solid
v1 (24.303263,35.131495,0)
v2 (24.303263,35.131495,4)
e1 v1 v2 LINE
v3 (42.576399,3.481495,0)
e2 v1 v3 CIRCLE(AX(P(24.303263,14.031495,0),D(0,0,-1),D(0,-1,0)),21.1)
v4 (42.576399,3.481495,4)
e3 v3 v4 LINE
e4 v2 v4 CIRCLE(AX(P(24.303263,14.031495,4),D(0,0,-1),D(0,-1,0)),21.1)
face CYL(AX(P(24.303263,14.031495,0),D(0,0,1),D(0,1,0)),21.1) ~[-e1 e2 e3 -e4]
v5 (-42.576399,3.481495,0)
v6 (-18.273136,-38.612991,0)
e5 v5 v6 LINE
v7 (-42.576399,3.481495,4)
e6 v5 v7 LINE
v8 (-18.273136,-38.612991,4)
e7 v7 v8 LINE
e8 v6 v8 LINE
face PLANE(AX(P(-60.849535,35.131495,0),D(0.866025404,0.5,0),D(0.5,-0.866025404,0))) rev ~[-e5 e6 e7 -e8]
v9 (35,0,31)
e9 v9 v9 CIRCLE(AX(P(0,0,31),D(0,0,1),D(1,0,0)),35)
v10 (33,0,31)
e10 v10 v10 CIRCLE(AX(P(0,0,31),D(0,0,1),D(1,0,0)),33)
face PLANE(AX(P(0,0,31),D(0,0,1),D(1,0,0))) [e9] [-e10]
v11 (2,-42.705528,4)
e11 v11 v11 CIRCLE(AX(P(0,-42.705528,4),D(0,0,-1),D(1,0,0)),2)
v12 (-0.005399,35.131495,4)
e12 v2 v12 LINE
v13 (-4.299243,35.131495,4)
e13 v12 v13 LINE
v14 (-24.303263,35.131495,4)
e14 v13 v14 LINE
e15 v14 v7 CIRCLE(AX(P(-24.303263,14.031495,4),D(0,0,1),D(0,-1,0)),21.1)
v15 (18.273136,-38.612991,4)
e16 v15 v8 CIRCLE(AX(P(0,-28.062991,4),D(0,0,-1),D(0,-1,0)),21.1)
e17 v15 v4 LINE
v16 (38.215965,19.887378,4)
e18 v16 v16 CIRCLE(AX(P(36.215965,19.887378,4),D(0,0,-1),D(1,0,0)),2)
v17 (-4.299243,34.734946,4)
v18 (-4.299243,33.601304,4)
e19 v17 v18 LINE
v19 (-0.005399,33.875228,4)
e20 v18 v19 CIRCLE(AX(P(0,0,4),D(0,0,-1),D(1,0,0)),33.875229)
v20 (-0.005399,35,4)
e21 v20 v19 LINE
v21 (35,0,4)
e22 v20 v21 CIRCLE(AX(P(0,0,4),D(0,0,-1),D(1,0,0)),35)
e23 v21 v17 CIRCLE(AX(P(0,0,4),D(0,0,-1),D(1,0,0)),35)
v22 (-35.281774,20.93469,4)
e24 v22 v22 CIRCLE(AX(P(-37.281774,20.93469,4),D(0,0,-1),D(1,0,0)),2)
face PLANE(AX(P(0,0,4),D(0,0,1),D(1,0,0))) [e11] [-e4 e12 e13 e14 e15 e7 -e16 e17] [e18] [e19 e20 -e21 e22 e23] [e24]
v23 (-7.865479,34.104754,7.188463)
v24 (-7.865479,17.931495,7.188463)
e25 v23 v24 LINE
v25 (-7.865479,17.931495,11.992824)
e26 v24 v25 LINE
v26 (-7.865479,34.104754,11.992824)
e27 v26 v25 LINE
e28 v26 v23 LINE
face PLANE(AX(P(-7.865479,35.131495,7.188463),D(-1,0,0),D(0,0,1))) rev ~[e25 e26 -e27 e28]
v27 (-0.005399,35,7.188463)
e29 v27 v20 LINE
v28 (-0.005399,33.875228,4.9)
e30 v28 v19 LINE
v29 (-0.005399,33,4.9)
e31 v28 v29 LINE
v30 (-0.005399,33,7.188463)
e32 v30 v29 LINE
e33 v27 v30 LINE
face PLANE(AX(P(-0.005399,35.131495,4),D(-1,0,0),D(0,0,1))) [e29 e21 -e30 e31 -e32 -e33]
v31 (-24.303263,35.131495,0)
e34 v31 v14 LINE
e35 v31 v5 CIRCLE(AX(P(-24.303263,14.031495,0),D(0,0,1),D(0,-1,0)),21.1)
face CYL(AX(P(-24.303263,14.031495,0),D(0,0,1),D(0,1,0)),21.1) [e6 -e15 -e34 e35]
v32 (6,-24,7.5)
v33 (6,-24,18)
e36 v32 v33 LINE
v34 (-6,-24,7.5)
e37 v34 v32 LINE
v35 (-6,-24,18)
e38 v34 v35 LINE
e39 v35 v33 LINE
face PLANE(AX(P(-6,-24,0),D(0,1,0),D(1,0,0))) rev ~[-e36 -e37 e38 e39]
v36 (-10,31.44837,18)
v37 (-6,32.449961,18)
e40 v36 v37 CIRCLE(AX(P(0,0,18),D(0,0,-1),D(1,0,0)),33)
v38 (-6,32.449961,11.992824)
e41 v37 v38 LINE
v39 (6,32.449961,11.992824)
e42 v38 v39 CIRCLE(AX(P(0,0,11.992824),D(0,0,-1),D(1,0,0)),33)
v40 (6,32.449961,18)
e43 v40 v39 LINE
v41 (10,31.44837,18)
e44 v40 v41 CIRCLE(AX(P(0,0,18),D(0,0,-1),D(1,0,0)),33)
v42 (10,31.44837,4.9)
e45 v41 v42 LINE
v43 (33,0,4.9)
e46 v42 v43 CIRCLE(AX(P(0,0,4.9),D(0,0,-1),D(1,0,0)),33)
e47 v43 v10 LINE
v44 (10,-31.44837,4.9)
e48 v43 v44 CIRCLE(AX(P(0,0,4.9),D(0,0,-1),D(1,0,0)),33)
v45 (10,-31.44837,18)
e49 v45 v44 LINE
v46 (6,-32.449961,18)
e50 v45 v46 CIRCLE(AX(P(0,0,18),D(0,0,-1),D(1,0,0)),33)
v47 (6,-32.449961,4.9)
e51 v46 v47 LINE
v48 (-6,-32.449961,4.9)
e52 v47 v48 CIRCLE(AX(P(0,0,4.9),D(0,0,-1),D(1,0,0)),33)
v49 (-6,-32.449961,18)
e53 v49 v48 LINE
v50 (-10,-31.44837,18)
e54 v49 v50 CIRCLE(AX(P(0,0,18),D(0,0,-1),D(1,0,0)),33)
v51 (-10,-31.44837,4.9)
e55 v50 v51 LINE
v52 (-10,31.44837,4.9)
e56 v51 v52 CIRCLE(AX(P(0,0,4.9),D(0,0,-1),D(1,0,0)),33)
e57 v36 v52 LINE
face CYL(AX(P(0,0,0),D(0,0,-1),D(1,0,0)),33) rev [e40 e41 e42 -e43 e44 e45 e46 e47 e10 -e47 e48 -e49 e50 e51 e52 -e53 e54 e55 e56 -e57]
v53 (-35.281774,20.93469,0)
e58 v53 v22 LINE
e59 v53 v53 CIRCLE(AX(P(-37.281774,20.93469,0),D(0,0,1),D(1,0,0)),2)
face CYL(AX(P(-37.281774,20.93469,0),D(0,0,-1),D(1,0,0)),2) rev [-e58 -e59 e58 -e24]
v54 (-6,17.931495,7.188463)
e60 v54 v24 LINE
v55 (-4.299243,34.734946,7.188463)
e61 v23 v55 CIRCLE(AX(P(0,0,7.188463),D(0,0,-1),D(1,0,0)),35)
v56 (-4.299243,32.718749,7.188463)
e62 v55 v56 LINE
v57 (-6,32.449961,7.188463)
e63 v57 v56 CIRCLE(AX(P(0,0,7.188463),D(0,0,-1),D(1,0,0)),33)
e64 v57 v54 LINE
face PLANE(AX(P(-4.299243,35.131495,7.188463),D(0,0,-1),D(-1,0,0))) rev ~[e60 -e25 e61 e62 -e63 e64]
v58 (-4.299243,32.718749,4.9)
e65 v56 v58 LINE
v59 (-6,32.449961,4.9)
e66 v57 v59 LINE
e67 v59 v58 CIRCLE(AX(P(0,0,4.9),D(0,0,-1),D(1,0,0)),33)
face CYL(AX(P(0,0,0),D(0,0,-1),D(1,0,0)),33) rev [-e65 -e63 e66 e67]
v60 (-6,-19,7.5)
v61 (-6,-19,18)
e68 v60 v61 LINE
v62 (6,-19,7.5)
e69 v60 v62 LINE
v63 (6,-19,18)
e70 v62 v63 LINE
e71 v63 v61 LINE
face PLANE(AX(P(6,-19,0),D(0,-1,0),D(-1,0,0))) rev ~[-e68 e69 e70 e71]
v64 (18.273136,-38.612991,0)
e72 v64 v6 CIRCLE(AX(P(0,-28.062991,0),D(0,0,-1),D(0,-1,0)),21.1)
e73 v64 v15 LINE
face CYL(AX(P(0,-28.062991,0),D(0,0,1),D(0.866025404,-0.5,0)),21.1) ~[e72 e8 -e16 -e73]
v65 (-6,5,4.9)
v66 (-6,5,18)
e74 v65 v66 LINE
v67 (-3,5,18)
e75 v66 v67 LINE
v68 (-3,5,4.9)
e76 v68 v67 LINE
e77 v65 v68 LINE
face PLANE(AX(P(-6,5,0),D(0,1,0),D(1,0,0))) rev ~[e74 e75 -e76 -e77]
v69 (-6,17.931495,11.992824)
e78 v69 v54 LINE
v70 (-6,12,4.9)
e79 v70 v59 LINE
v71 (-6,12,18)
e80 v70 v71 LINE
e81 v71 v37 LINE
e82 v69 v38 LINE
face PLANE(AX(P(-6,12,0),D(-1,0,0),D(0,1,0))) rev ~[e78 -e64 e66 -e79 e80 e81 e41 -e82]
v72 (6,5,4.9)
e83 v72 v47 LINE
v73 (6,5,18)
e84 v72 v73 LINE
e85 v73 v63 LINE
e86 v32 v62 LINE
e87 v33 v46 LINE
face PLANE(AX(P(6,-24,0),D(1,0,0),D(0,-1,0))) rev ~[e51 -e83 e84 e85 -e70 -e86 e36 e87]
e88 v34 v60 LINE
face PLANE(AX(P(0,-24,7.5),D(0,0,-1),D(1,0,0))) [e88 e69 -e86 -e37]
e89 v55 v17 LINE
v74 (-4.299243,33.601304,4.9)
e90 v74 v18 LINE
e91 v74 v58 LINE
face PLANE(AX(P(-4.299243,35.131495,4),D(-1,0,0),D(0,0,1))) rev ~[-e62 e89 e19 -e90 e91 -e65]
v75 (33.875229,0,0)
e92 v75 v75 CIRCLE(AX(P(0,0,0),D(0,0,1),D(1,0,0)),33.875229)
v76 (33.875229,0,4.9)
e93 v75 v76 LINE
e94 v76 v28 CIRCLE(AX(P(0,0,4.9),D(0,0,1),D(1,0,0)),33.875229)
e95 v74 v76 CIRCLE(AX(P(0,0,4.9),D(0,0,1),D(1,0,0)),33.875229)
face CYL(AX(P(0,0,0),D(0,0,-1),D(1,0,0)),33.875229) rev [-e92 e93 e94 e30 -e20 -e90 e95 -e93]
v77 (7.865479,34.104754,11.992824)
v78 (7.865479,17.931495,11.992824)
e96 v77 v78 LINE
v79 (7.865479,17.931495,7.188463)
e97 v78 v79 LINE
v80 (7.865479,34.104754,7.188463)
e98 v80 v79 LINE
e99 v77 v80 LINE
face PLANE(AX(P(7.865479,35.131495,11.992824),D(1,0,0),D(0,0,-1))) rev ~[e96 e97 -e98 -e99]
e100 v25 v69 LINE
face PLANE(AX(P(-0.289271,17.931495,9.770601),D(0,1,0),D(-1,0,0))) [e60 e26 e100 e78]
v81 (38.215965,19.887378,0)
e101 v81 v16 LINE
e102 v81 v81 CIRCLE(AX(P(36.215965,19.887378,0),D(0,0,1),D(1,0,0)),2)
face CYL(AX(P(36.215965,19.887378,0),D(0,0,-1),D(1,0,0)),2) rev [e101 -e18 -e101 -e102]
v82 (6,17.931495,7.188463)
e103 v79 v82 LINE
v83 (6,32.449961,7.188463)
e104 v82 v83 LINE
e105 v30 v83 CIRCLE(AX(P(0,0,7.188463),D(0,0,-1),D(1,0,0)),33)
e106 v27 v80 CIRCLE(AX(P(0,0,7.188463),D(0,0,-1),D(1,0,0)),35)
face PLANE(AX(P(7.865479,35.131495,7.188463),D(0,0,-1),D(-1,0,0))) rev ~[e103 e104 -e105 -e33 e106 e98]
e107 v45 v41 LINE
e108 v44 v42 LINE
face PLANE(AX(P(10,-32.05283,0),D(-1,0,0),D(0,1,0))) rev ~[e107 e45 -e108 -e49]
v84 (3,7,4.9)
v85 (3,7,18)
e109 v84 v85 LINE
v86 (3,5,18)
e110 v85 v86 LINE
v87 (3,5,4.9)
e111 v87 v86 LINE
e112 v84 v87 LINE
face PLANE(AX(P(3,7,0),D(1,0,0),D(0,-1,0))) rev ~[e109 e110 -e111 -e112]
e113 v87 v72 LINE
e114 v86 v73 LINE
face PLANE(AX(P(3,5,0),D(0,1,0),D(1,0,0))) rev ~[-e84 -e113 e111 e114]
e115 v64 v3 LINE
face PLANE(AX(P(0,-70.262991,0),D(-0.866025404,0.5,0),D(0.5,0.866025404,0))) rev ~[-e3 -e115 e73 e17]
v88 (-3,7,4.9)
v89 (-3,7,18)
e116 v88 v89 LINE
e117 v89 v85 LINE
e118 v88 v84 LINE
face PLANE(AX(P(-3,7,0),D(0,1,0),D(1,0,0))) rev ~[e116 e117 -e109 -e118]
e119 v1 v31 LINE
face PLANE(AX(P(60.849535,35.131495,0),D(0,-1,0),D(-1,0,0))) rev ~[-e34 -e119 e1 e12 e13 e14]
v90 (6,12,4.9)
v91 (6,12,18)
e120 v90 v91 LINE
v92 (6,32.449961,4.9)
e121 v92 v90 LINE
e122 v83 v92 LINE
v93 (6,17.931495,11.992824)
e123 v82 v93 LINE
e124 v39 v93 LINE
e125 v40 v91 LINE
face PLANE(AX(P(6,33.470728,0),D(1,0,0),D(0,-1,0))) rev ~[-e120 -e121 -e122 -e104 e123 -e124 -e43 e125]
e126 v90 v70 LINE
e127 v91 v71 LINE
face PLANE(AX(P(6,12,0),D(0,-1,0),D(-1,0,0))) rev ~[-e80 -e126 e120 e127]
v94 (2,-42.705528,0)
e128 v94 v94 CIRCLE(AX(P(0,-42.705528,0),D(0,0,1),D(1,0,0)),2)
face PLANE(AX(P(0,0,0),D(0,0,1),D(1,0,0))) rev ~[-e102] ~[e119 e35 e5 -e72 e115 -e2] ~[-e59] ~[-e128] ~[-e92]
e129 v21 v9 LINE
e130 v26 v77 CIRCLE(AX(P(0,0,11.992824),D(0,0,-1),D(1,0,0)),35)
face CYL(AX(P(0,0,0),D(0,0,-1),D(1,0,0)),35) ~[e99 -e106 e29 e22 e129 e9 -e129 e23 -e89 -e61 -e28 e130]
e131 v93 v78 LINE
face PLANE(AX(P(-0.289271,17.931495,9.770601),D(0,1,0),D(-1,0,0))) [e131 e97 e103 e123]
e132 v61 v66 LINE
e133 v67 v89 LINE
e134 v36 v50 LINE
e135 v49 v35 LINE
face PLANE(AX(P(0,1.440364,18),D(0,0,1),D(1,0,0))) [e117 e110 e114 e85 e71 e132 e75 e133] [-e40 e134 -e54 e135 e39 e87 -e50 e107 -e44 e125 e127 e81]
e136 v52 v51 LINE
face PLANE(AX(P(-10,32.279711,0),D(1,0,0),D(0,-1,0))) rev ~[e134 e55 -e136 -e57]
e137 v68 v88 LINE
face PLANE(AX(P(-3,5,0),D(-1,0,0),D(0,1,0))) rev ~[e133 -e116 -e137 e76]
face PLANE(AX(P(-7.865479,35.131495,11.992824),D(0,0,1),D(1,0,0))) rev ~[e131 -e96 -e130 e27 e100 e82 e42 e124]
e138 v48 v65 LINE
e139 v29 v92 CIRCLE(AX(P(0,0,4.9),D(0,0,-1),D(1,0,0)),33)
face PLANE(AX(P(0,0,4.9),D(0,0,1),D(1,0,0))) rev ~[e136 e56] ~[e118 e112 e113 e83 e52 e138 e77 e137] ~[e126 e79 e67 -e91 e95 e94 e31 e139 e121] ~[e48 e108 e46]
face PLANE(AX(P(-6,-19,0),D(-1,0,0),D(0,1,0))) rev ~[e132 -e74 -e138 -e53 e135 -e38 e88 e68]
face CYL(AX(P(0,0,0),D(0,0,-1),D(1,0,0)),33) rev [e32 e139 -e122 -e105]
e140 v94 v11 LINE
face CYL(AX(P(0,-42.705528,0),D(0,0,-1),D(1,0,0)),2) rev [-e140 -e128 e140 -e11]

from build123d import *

# Parameters (mm, degrees)
F0_R              = 35
F0_R_2            = 33
F2_DEPTH          = 31
F3_DEPTH          = 18
F4_E28_W          = 6
F4_E28_H          = 7.5
F4_E39_MIRRORCS_W = 6
F4_E39_MIRRORCS_H = 7.5
F5_DEPTH          = 9.3
F7_DEPTH          = 4
F8_R              = 21.1
F9_R              = 2
F10_DEPTH         = 38
F11_DEPTH         = 52
F12_DEPTH         = 37.9
F13_R             = 33.8752288108
F14_DEPTH         = 4.9
F15_W             = 4.2938441038
F15_H             = 3.1884626523
F16_DEPTH         = 17.2


with BuildPart() as f2:
    # F0 (on Top) → F2 (new body)
    with BuildSketch(Plane.XY):
        Circle(F0_R)
        Circle(F0_R_2, mode=Mode.SUBTRACT)
    extrude(amount=F2_DEPTH)

    # F1 (on Top) → F3 (join)
    with BuildSketch(Plane.XY):
        Polygon((10, -32.0528298616), (10, -24), (10, 32.2797112167), (6, 33.4707275033), (6, 12), (3, 12), (0, 12), (-3, 12), (-6, 12), (-6, 33.4707275033), (-10, 32.2797112167), (-10, -24), (-10, -32.0528298616), (-6, -33.1044308841), (-6, -24), (0, -24), (6, -24), (6, -33.1044308841), align=None)
        Polygon((0, 7), (3, 7), (3, 5), (6, 5), (6, -19), (0, -19), (-6, -19), (-6, 5), (-3, 5), (-3, 7), align=None, mode=Mode.SUBTRACT)
    extrude(amount=F3_DEPTH)

    # F4_E28 (on explicit) + F4_E39_MirrorCS (on explicit) → F5 (cut)
    with BuildSketch(Plane.XZ.offset(24)):
        with Locations((3, 3.75)):
            Rectangle(F4_E28_W, F4_E28_H)
    with BuildSketch(Plane(origin=(0, -24, 0), x_dir=(-1, 0, 0), z_dir=(0, 1, 0))):
        with Locations((3, 3.75)):
            Rectangle(F4_E39_MIRRORCS_W, F4_E39_MIRRORCS_H)
    extrude(amount=-F5_DEPTH, dir=(0, -1, 0), mode=Mode.SUBTRACT)

    # F6 (on Top) → F7 (join)
    with BuildSketch(Plane.XY):
        Polygon((60.8495350583, 35.131495446), (-60.8495350583, 35.131495446), (0, -70.2629908919), align=None)
    extrude(amount=F7_DEPTH)

    # F8
    f8_edges = [f2.edges().sort_by_distance(p)[0] for p in [
        (-60.849535, 35.131495, 2),
        (60.849535, 35.131495, 2),
        (0, -70.262991, 2),
    ]]
    fillet(f8_edges, radius=F8_R)

    # F9 (on Top) → F10 (cut)
    with BuildSketch(Plane.XY):
        with Locations((-37.2817739844, 20.93468979)):
            Circle(F9_R)
        with Locations((0, -42.7055284381)):
            Circle(F9_R)
        with Locations((36.2159647048, 19.8873784393)):
            Circle(F9_R)
    extrude(amount=-F10_DEPTH, mode=Mode.SUBTRACT)

    # F9 (on Top) → F11 (cut)
    with BuildSketch(Plane.XY):
        with Locations((36.2159647048, 19.8873784393)):
            Circle(F9_R)
    extrude(amount=F11_DEPTH, mode=Mode.SUBTRACT)

    # F9 (on Top) → F12 (cut)
    with BuildSketch(Plane.XY):
        with Locations((-37.2817739844, 20.93468979)):
            Circle(F9_R)
        with Locations((0, -42.7055284381)):
            Circle(F9_R)
    extrude(amount=F12_DEPTH, mode=Mode.SUBTRACT)

    # F13 (on Top) → F14 (cut)
    with BuildSketch(Plane.XY):
        Circle(F13_R)
    extrude(amount=F14_DEPTH, mode=Mode.SUBTRACT)

    # F15 (on face) → F16 (cut)
    with BuildSketch(Plane(origin=(0, 35.131495446, 0), x_dir=(-1, 0, 0), z_dir=(0, 1, 0))):
        Polygon((-7.865479216, 7.1884626523), (-0.6682581179, 7.1884626523), (0.0053993426, 7.1884626523), (0.0053993426, 10.3769253045), (4.2992434464, 10.3769253045), (4.2992434464, 7.1884626523), (7.865479216, 7.1884626523), (7.865479216, 11.9928242639), (-7.865479216, 11.9928242639), align=None)
        with Locations((2.1523213945, 8.7826939784)):
            Rectangle(F15_W, F15_H)
        with Locations((2.1523213945, 5.5942313261)):
            Rectangle(F15_W, F15_H)
    extrude(amount=-F16_DEPTH, mode=Mode.SUBTRACT)


solid = f2.part
